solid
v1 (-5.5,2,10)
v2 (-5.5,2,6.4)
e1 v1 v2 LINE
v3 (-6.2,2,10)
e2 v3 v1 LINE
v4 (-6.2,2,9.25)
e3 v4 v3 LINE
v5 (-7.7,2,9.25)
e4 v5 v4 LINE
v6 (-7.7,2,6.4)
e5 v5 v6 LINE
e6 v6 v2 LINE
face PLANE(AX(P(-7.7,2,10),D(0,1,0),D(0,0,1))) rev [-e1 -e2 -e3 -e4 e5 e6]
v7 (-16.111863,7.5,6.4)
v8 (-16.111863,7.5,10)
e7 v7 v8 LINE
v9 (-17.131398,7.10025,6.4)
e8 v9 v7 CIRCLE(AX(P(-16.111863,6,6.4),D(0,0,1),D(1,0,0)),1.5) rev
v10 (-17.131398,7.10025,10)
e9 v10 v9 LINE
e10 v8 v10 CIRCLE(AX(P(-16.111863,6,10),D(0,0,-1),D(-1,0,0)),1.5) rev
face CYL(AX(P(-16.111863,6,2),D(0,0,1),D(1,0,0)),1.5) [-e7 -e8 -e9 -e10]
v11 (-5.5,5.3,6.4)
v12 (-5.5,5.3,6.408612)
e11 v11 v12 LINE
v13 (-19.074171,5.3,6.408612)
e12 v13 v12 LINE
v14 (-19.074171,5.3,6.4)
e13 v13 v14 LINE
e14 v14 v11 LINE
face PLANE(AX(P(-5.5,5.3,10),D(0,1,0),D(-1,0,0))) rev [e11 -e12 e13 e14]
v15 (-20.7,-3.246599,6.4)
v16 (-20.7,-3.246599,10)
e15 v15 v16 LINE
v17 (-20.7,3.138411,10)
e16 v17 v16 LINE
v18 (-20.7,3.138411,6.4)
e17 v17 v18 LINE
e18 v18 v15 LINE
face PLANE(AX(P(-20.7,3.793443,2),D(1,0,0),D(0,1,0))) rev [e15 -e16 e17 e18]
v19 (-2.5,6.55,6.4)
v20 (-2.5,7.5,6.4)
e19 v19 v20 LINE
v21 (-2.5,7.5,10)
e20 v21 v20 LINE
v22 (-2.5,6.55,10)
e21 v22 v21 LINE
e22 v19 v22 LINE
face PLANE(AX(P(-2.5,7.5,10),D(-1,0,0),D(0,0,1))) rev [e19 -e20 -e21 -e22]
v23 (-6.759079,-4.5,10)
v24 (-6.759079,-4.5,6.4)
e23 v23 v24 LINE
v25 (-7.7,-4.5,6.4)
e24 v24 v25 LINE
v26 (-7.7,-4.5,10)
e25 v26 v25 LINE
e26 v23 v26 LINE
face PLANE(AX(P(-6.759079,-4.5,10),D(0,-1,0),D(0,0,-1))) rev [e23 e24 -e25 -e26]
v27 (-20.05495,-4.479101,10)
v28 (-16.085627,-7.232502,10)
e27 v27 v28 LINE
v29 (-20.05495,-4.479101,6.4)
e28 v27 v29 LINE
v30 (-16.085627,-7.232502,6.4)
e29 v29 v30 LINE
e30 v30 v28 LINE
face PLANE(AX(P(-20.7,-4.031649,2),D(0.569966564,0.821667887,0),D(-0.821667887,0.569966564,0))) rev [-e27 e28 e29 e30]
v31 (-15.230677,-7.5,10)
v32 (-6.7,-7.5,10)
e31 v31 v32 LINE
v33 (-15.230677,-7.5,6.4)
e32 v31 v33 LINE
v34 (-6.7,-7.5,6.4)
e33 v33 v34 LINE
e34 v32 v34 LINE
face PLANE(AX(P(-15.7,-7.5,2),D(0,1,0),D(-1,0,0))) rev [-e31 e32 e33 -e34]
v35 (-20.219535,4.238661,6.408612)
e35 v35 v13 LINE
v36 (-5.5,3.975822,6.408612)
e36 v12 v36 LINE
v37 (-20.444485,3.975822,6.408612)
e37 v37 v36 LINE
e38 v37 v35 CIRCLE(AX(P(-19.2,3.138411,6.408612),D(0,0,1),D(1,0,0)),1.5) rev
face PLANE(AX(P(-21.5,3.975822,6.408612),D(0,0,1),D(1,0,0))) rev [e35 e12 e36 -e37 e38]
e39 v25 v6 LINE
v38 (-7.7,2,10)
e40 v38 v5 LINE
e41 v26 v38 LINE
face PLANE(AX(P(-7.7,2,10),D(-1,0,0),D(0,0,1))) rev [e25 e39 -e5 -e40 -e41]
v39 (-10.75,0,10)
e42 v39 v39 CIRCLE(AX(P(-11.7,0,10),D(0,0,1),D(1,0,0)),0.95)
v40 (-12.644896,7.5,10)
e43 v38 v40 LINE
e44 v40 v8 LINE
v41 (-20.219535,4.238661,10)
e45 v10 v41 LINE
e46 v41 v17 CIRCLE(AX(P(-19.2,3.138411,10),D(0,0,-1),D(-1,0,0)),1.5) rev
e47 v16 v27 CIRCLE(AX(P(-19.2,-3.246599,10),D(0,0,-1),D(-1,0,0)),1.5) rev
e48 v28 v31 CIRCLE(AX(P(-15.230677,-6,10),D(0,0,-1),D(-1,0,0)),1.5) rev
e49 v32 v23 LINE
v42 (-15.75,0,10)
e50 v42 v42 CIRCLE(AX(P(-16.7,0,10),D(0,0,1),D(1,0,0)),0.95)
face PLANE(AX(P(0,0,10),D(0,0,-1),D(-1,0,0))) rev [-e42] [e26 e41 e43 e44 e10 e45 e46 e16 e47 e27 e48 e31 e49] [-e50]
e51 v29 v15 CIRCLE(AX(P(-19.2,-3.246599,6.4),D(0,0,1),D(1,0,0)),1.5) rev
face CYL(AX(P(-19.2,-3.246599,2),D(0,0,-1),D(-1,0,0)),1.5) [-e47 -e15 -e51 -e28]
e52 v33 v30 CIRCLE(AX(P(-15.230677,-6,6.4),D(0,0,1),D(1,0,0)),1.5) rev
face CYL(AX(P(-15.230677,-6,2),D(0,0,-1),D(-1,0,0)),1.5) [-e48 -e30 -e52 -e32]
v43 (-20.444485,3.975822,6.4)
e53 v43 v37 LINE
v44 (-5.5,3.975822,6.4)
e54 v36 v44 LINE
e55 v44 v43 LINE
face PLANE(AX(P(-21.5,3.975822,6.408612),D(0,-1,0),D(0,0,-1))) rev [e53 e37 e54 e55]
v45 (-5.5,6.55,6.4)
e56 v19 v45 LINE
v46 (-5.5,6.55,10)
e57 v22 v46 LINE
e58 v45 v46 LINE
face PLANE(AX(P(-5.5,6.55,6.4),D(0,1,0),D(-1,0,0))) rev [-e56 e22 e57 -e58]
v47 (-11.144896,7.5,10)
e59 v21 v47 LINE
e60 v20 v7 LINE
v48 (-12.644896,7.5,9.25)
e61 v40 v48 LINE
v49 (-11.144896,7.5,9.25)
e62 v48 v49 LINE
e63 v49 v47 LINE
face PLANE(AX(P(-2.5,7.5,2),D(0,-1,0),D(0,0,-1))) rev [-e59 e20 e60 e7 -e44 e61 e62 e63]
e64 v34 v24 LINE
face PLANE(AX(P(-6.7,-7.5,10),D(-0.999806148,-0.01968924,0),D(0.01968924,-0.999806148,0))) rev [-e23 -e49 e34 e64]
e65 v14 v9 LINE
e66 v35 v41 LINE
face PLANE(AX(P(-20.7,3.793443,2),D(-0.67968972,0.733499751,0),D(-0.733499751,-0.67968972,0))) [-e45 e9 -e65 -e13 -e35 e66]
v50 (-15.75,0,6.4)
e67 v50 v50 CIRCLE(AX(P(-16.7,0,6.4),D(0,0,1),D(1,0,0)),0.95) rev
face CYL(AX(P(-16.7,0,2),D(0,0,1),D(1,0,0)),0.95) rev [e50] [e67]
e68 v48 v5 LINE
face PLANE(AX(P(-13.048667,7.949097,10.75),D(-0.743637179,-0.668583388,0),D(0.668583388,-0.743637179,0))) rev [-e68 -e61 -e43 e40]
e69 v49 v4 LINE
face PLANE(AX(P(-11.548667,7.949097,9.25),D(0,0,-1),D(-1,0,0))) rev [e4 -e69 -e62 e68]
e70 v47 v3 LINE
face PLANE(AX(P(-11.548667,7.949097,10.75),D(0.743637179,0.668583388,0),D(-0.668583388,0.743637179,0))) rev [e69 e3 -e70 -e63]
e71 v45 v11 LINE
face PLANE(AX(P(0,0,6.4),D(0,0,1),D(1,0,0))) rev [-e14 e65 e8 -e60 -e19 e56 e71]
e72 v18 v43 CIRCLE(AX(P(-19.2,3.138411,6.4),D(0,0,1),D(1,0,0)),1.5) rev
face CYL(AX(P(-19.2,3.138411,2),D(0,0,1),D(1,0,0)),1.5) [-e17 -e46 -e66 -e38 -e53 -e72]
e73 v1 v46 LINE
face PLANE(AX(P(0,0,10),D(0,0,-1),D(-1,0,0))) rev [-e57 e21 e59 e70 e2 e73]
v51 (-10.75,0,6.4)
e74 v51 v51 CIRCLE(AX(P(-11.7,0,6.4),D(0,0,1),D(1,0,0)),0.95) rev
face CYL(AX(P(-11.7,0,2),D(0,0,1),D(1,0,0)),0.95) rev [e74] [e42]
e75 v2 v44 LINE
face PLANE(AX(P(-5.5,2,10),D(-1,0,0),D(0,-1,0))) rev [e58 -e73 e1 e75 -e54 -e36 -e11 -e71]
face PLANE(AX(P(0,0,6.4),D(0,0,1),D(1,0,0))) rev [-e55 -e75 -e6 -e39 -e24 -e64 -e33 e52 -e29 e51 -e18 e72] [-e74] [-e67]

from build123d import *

# Parameters (mm, degrees)
BOSS_EXTRUDE1_DEPTH = 2
BOSS_EXTRUDE2_DEPTH = 8
SKETCH24_R          = 3.9
BOSS_EXTRUDE5_DEPTH = 4.4
SKETCH30_W          = 4.40861202
SKETCH30_H          = 1.324178481
CUT_EXTRUDE12_DEPTH = 16
CUT_EXTRUDE11_DEPTH = 23.928148639
FILLET1_R           = 1.5
SKETCH34_W          = 1.5
SKETCH34_H          = 1.5
CUT_EXTRUDE13_DEPTH = 8
SKETCH36_R          = 0.95
CUT_EXTRUDE15_DEPTH = 8
SKETCH37_R          = 2
CUT_EXTRUDE16_DEPTH = 4.5
SKETCH38_W          = 3
SKETCH38_H          = 1.25
CUT_EXTRUDE17_DEPTH = 3.6


with BuildPart() as part:
    # Sketch2 → Boss-Extrude1 (new body)
    with BuildSketch(Plane.XY):
        with BuildLine():
            Line((-2.5, 7.5), (-16.7, 7.5))
            Line((-16.7, 7.5), (-20.7, 3.793442666))
            Line((-20.7, 3.793442666), (-20.7, -4.031648778))
            Line((-20.7, -4.031648778), (-15.7, -7.5))
            Line((-15.7, -7.5), (-6.7, -7.5))
            Line((-6.7, -7.5), (-4.2, -5.6))
            ThreePointArc((-4.2, -5.6), (3.130495168, -6.260990337), (7, 0))
            ThreePointArc((7, 0), (4.949747468, 4.949747468), (0, 7))
            Line((0, 7), (0, 7.5))
            Line((0, 7.5), (-2.5, 7.5))
        make_face()
    extrude(amount=BOSS_EXTRUDE1_DEPTH)

    # Sketch4 → Boss-Extrude2 (add)
    with BuildSketch(Plane.XY.offset(2)):
        Polygon((-15.7, -7.5), (-6.7, -7.5), (-6.759079174, -4.5), (-7.7, -4.5), (-7.7, 2), (-5.5, 2), (-5.5, 5.3), (-2.5, 5.3), (-2.5, 7.5), (-16.7, 7.5), (-20.7, 3.793442666), (-20.7, -4.031648778), align=None)
    extrude(amount=BOSS_EXTRUDE2_DEPTH)

    # Sketch24 → Boss-Extrude5 (add)
    with BuildSketch(Plane.XY.offset(2)):
        Circle(SKETCH24_R)
    extrude(amount=BOSS_EXTRUDE5_DEPTH)

    # Sketch30 → Cut-Extrude12 (cut)
    with BuildSketch(Plane(origin=(-5.5, 0, 0), x_dir=(0, 0, -1), z_dir=(1, 0, 0))):
        with Locations((-4.20430601, 4.63791076)):
            Rectangle(SKETCH30_W, SKETCH30_H)
    extrude(amount=-CUT_EXTRUDE12_DEPTH, mode=Mode.SUBTRACT)

    # Sketch28 → Cut-Extrude11 (cut, through all)
    with BuildSketch(Plane.XY.offset(6.4)):
        with BuildLine():
            Line((-1, 0.979795897), (-1, -0.979795897))
            ThreePointArc((-1, -0.979795897), (1.4, 0), (-1, 0.979795897))
        make_face()
    extrude(amount=-CUT_EXTRUDE11_DEPTH, mode=Mode.SUBTRACT)

    # Fillet1
    # the kernel refuses this fillet: 1.5 mm, written as the material it takes off along each edge
    with BuildSketch(Plane(origin=(-15.230677435, -6, 1.5), x_dir=(-0.5699665637840448, -0.8216678867816415, 0), z_dir=(0, 0, -1))) as fillet1_piece_1_section:
        Polygon((0, 0), (FILLET1_R * 1.02, 0), (FILLET1_R * 1.02, -FILLET1_R * 0.319139344377), (FILLET1_R * 0.838101244517, -FILLET1_R * 0.58136589506), align=None)
    fillet1_piece_1 = extrude(amount=FILLET1_R * 1.02, mode=Mode.PRIVATE)
    fillet1_piece_1 = fillet1_piece_1 - Plane(origin=(-15.230677435, -6, 1.5), x_dir=(0.29860685961507855, 0.9543762064253388, 0), z_dir=(0, 0, -1)) * Sphere(FILLET1_R, mode=Mode.PRIVATE)
    add(fillet1_piece_1, mode=Mode.SUBTRACT)
    with BuildSketch(Plane(origin=(-16.11186344, 6, 1.5), x_dir=(-0.6796897201843015, 0.7334997506991983, 0), z_dir=(0, 0, -1))) as fillet1_piece_2_section:
        Polygon((0, 0), (FILLET1_R * 1.02, 0), (FILLET1_R * 1.02, FILLET1_R * 0.399932860855), (FILLET1_R * 0.748169745713, FILLET1_R * 0.693283514588), align=None)
    fillet1_piece_2 = extrude(amount=FILLET1_R * 1.02, mode=Mode.PRIVATE)
    fillet1_piece_2 = fillet1_piece_2 - Plane(origin=(-16.11186344, 6, 1.5), x_dir=(0.3650344157067945, -0.9309940254102596, 0), z_dir=(0, 0, -1)) * Sphere(FILLET1_R, mode=Mode.PRIVATE)
    add(fillet1_piece_2, mode=Mode.SUBTRACT)
    with BuildSketch(Plane(origin=(-19.2, 3.138411196, 1.5), x_dir=(-0.6796897201843015, 0.7334997506991983, 0), z_dir=(0, 0, -1))) as fillet1_piece_3_section:
        Polygon((0, 0), (FILLET1_R * 1.02, 0), (FILLET1_R * 1.02, -FILLET1_R * 0.445421399395), (FILLET1_R * 0.693283514588, -FILLET1_R * 0.748169745713), align=None)
    fillet1_piece_3 = extrude(amount=FILLET1_R * 1.02, mode=Mode.PRIVATE)
    fillet1_piece_3 = fillet1_piece_3 - Plane(origin=(-19.2, 3.138411196, 1.5), x_dir=(0.9164304993244992, -0.40019387789901173, 0), z_dir=(0, 0, -1)) * Sphere(FILLET1_R, mode=Mode.PRIVATE)
    add(fillet1_piece_3, mode=Mode.SUBTRACT)
    with BuildSketch(Plane(origin=(-19.2, -3.246599046, 1.5), x_dir=(-0.5699665637840448, -0.8216678867816415, 0), z_dir=(0, 0, -1))) as fillet1_piece_4_section:
        Polygon((0, 0), (FILLET1_R * 1.02, 0), (FILLET1_R * 1.02, FILLET1_R * 0.533833817771), (FILLET1_R * 0.58136589506, FILLET1_R * 0.838101244517), align=None)
    fillet1_piece_4 = extrude(amount=FILLET1_R * 1.02, mode=Mode.PRIVATE)
    fillet1_piece_4 = fillet1_piece_4 - Plane(origin=(-19.2, -3.246599046, 1.5), x_dir=(0.8859928227090906, 0.46369895202380795, 0), z_dir=(0, 0, -1)) * Sphere(FILLET1_R, mode=Mode.PRIVATE)
    add(fillet1_piece_4, mode=Mode.SUBTRACT)
    with BuildSketch(Plane(origin=(-15.230677435, -7.5, 0), x_dir=(0, 1, 0), z_dir=(1, 0, 0))) as fillet1_piece_5_section:
        with BuildLine():
            CenterArc((FILLET1_R, FILLET1_R), FILLET1_R, 180, 90)
            Line((0, FILLET1_R), (0, 0))
            Line((0, 0), (FILLET1_R, 0))
        make_face()
    fillet1_piece_5 = extrude(amount=12.280677435, mode=Mode.PRIVATE)
    fillet1_piece_5 = split(fillet1_piece_5, bisect_by=Plane(origin=(-9.092127217, -9.318016685, 0.3282266), z_dir=(-0.6050832675335577, 0.7961621941231027, 0)), keep=Keep.TOP, mode=Mode.PRIVATE)
    add(fillet1_piece_5, mode=Mode.SUBTRACT)
    with BuildSketch(Plane(origin=(3.75, 7.5, 0), x_dir=(0, 0, 1), z_dir=(-1, 0, 0))) as fillet1_piece_6:
        with BuildLine():
            CenterArc((FILLET1_R, -FILLET1_R), FILLET1_R, 90, 90)
            Line((0, -FILLET1_R), (0, 0))
            Line((0, 0), (FILLET1_R, 0))
        make_face()
    extrude(amount=19.86186344, mode=Mode.SUBTRACT)
    with BuildSketch(Plane(origin=(-17.13139802, 7.100249626, 0), x_dir=(0.6796897201843014, -0.7334997506991981, 0), z_dir=(-0.7334997506991983, -0.6796897201843015, 0))) as fillet1_piece_7:
        with BuildLine():
            CenterArc((FILLET1_R, FILLET1_R), FILLET1_R, 180, 90)
            Line((0, FILLET1_R), (0, 0))
            Line((0, 0), (FILLET1_R, 0))
        make_face()
    extrude(amount=4.21013989, mode=Mode.SUBTRACT)
    with BuildSketch(Plane(origin=(-20.054949846, -4.479100876, 0), x_dir=(0.5699665637840448, 0.8216678867816416, 0), z_dir=(0.8216678867816415, -0.5699665637840448, 0))) as fillet1_piece_8:
        with BuildLine():
            CenterArc((FILLET1_R, FILLET1_R), FILLET1_R, 180, 90)
            Line((0, FILLET1_R), (0, 0))
            Line((0, 0), (FILLET1_R, 0))
        make_face()
    extrude(amount=4.830811364, mode=Mode.SUBTRACT)
    with BuildSketch(Plane(origin=(-20.7, 3.138411196, 0), x_dir=(1, 0, 0), z_dir=(0, -1, 0))) as fillet1_piece_9:
        with BuildLine():
            CenterArc((FILLET1_R, FILLET1_R), FILLET1_R, 180, 90)
            Line((0, FILLET1_R), (0, 0))
            Line((0, 0), (FILLET1_R, 0))
        make_face()
    extrude(amount=6.385010242, mode=Mode.SUBTRACT)
    with BuildSketch(Plane(origin=(-15.7, -7.5, 1.5), x_dir=(1, 0, 0), z_dir=(0, 0, 1))) as fillet1_piece_10:
        with BuildLine():
            CenterArc((FILLET1_R * 0.312881710173, FILLET1_R), FILLET1_R, 235.252105822, 34.747894178)
            Line((-FILLET1_R * 0.257084853611, FILLET1_R * 0.178332113218), (0, 0))
            Line((0, 0), (FILLET1_R * 0.312881710173, 0))
        make_face()
    extrude(amount=9.673306413, mode=Mode.SUBTRACT)
    with BuildSketch(Plane(origin=(-20.7, -4.031648778, 1.5), x_dir=(0, 1, 0), z_dir=(0, 0, 1))) as fillet1_piece_11:
        with BuildLine():
            CenterArc((FILLET1_R * 0.523366488011, -FILLET1_R), FILLET1_R, 90, 55.252105822)
            Line((-FILLET1_R * 0.298301398771, -FILLET1_R * 0.430033436216), (0, 0))
            Line((0, 0), (FILLET1_R * 0.523366488011, 0))
        make_face()
    extrude(amount=10.46262433, mode=Mode.SUBTRACT)
    with BuildSketch(Plane(origin=(-20.7, 3.793442666, 1.5), x_dir=(0.7334997506991984, 0.6796897201843014, 0), z_dir=(0, 0, 1))) as fillet1_piece_12:
        with BuildLine():
            CenterArc((FILLET1_R * 0.436687646465, -FILLET1_R), FILLET1_R, 90, 47.18059856)
            Line((-FILLET1_R * 0.296812104234, -FILLET1_R * 0.320310279816), (0, 0))
            Line((0, 0), (FILLET1_R * 0.436687646465, 0))
        make_face()
    extrude(amount=10.137578674, mode=Mode.SUBTRACT)
    with BuildSketch(Plane(origin=(-16.7, 7.5, 1.5), x_dir=(1, 0, 0), z_dir=(0, 0, 1))) as fillet1_piece_13:
        with BuildLine():
            CenterArc((FILLET1_R * 0.392091040054, -FILLET1_R), FILLET1_R, 90, 42.81940144)
            Line((-FILLET1_R * 0.287598680131, -FILLET1_R * 0.266500249301), (0, 0))
            Line((0, 0), (FILLET1_R * 0.392091040054, 0))
        make_face()
    extrude(amount=9.9703414, mode=Mode.SUBTRACT)

    # Sketch34 → Cut-Extrude13 (cut, along a direction that is not the sketch's normal)
    with BuildSketch(Plane.XZ.offset(-2)):
        with Locations((-6.95, 10)):
            Rectangle(SKETCH34_W, SKETCH34_H)
    extrude(amount=-CUT_EXTRUDE13_DEPTH, dir=(0.6685833876565112, -0.7436371788377336, 0), mode=Mode.SUBTRACT)

    # Sketch36 → Cut-Extrude15 (cut)
    with BuildSketch(Plane.XY.offset(10)):
        with Locations((-11.7, 0)):
            Circle(SKETCH36_R)
        with Locations((-16.7, 0)):
            Circle(SKETCH36_R)
    extrude(amount=-CUT_EXTRUDE15_DEPTH, mode=Mode.SUBTRACT)

    # Sketch37 → Cut-Extrude16 (cut)
    with BuildSketch(Plane(origin=(0, 0, 0), x_dir=(-1, 0, 0), z_dir=(0, 0, -1))):
        with Locations((11.7, 0)):
            Circle(SKETCH37_R)
        with Locations((16.7, 0)):
            Circle(SKETCH37_R)
    extrude(amount=-CUT_EXTRUDE16_DEPTH, mode=Mode.SUBTRACT)

    # Sketch38 → Cut-Extrude17 (cut)
    with BuildSketch(Plane.XY.offset(10)):
        with Locations((-4, 5.925)):
            Rectangle(SKETCH38_W, SKETCH38_H)
    extrude(amount=-CUT_EXTRUDE17_DEPTH, mode=Mode.SUBTRACT)


with BuildPart() as body_2:
    # Split1: the piece on the far side of the plane
    add(part.part)
    split(bisect_by=Plane.XY.offset(6.4), keep=Keep.BOTTOM)


with BuildPart() as part_1:
    add(part.part)

    # Split1
    split(bisect_by=Plane.XY.offset(6.4), keep=Keep.TOP)


solid = part_1.part
